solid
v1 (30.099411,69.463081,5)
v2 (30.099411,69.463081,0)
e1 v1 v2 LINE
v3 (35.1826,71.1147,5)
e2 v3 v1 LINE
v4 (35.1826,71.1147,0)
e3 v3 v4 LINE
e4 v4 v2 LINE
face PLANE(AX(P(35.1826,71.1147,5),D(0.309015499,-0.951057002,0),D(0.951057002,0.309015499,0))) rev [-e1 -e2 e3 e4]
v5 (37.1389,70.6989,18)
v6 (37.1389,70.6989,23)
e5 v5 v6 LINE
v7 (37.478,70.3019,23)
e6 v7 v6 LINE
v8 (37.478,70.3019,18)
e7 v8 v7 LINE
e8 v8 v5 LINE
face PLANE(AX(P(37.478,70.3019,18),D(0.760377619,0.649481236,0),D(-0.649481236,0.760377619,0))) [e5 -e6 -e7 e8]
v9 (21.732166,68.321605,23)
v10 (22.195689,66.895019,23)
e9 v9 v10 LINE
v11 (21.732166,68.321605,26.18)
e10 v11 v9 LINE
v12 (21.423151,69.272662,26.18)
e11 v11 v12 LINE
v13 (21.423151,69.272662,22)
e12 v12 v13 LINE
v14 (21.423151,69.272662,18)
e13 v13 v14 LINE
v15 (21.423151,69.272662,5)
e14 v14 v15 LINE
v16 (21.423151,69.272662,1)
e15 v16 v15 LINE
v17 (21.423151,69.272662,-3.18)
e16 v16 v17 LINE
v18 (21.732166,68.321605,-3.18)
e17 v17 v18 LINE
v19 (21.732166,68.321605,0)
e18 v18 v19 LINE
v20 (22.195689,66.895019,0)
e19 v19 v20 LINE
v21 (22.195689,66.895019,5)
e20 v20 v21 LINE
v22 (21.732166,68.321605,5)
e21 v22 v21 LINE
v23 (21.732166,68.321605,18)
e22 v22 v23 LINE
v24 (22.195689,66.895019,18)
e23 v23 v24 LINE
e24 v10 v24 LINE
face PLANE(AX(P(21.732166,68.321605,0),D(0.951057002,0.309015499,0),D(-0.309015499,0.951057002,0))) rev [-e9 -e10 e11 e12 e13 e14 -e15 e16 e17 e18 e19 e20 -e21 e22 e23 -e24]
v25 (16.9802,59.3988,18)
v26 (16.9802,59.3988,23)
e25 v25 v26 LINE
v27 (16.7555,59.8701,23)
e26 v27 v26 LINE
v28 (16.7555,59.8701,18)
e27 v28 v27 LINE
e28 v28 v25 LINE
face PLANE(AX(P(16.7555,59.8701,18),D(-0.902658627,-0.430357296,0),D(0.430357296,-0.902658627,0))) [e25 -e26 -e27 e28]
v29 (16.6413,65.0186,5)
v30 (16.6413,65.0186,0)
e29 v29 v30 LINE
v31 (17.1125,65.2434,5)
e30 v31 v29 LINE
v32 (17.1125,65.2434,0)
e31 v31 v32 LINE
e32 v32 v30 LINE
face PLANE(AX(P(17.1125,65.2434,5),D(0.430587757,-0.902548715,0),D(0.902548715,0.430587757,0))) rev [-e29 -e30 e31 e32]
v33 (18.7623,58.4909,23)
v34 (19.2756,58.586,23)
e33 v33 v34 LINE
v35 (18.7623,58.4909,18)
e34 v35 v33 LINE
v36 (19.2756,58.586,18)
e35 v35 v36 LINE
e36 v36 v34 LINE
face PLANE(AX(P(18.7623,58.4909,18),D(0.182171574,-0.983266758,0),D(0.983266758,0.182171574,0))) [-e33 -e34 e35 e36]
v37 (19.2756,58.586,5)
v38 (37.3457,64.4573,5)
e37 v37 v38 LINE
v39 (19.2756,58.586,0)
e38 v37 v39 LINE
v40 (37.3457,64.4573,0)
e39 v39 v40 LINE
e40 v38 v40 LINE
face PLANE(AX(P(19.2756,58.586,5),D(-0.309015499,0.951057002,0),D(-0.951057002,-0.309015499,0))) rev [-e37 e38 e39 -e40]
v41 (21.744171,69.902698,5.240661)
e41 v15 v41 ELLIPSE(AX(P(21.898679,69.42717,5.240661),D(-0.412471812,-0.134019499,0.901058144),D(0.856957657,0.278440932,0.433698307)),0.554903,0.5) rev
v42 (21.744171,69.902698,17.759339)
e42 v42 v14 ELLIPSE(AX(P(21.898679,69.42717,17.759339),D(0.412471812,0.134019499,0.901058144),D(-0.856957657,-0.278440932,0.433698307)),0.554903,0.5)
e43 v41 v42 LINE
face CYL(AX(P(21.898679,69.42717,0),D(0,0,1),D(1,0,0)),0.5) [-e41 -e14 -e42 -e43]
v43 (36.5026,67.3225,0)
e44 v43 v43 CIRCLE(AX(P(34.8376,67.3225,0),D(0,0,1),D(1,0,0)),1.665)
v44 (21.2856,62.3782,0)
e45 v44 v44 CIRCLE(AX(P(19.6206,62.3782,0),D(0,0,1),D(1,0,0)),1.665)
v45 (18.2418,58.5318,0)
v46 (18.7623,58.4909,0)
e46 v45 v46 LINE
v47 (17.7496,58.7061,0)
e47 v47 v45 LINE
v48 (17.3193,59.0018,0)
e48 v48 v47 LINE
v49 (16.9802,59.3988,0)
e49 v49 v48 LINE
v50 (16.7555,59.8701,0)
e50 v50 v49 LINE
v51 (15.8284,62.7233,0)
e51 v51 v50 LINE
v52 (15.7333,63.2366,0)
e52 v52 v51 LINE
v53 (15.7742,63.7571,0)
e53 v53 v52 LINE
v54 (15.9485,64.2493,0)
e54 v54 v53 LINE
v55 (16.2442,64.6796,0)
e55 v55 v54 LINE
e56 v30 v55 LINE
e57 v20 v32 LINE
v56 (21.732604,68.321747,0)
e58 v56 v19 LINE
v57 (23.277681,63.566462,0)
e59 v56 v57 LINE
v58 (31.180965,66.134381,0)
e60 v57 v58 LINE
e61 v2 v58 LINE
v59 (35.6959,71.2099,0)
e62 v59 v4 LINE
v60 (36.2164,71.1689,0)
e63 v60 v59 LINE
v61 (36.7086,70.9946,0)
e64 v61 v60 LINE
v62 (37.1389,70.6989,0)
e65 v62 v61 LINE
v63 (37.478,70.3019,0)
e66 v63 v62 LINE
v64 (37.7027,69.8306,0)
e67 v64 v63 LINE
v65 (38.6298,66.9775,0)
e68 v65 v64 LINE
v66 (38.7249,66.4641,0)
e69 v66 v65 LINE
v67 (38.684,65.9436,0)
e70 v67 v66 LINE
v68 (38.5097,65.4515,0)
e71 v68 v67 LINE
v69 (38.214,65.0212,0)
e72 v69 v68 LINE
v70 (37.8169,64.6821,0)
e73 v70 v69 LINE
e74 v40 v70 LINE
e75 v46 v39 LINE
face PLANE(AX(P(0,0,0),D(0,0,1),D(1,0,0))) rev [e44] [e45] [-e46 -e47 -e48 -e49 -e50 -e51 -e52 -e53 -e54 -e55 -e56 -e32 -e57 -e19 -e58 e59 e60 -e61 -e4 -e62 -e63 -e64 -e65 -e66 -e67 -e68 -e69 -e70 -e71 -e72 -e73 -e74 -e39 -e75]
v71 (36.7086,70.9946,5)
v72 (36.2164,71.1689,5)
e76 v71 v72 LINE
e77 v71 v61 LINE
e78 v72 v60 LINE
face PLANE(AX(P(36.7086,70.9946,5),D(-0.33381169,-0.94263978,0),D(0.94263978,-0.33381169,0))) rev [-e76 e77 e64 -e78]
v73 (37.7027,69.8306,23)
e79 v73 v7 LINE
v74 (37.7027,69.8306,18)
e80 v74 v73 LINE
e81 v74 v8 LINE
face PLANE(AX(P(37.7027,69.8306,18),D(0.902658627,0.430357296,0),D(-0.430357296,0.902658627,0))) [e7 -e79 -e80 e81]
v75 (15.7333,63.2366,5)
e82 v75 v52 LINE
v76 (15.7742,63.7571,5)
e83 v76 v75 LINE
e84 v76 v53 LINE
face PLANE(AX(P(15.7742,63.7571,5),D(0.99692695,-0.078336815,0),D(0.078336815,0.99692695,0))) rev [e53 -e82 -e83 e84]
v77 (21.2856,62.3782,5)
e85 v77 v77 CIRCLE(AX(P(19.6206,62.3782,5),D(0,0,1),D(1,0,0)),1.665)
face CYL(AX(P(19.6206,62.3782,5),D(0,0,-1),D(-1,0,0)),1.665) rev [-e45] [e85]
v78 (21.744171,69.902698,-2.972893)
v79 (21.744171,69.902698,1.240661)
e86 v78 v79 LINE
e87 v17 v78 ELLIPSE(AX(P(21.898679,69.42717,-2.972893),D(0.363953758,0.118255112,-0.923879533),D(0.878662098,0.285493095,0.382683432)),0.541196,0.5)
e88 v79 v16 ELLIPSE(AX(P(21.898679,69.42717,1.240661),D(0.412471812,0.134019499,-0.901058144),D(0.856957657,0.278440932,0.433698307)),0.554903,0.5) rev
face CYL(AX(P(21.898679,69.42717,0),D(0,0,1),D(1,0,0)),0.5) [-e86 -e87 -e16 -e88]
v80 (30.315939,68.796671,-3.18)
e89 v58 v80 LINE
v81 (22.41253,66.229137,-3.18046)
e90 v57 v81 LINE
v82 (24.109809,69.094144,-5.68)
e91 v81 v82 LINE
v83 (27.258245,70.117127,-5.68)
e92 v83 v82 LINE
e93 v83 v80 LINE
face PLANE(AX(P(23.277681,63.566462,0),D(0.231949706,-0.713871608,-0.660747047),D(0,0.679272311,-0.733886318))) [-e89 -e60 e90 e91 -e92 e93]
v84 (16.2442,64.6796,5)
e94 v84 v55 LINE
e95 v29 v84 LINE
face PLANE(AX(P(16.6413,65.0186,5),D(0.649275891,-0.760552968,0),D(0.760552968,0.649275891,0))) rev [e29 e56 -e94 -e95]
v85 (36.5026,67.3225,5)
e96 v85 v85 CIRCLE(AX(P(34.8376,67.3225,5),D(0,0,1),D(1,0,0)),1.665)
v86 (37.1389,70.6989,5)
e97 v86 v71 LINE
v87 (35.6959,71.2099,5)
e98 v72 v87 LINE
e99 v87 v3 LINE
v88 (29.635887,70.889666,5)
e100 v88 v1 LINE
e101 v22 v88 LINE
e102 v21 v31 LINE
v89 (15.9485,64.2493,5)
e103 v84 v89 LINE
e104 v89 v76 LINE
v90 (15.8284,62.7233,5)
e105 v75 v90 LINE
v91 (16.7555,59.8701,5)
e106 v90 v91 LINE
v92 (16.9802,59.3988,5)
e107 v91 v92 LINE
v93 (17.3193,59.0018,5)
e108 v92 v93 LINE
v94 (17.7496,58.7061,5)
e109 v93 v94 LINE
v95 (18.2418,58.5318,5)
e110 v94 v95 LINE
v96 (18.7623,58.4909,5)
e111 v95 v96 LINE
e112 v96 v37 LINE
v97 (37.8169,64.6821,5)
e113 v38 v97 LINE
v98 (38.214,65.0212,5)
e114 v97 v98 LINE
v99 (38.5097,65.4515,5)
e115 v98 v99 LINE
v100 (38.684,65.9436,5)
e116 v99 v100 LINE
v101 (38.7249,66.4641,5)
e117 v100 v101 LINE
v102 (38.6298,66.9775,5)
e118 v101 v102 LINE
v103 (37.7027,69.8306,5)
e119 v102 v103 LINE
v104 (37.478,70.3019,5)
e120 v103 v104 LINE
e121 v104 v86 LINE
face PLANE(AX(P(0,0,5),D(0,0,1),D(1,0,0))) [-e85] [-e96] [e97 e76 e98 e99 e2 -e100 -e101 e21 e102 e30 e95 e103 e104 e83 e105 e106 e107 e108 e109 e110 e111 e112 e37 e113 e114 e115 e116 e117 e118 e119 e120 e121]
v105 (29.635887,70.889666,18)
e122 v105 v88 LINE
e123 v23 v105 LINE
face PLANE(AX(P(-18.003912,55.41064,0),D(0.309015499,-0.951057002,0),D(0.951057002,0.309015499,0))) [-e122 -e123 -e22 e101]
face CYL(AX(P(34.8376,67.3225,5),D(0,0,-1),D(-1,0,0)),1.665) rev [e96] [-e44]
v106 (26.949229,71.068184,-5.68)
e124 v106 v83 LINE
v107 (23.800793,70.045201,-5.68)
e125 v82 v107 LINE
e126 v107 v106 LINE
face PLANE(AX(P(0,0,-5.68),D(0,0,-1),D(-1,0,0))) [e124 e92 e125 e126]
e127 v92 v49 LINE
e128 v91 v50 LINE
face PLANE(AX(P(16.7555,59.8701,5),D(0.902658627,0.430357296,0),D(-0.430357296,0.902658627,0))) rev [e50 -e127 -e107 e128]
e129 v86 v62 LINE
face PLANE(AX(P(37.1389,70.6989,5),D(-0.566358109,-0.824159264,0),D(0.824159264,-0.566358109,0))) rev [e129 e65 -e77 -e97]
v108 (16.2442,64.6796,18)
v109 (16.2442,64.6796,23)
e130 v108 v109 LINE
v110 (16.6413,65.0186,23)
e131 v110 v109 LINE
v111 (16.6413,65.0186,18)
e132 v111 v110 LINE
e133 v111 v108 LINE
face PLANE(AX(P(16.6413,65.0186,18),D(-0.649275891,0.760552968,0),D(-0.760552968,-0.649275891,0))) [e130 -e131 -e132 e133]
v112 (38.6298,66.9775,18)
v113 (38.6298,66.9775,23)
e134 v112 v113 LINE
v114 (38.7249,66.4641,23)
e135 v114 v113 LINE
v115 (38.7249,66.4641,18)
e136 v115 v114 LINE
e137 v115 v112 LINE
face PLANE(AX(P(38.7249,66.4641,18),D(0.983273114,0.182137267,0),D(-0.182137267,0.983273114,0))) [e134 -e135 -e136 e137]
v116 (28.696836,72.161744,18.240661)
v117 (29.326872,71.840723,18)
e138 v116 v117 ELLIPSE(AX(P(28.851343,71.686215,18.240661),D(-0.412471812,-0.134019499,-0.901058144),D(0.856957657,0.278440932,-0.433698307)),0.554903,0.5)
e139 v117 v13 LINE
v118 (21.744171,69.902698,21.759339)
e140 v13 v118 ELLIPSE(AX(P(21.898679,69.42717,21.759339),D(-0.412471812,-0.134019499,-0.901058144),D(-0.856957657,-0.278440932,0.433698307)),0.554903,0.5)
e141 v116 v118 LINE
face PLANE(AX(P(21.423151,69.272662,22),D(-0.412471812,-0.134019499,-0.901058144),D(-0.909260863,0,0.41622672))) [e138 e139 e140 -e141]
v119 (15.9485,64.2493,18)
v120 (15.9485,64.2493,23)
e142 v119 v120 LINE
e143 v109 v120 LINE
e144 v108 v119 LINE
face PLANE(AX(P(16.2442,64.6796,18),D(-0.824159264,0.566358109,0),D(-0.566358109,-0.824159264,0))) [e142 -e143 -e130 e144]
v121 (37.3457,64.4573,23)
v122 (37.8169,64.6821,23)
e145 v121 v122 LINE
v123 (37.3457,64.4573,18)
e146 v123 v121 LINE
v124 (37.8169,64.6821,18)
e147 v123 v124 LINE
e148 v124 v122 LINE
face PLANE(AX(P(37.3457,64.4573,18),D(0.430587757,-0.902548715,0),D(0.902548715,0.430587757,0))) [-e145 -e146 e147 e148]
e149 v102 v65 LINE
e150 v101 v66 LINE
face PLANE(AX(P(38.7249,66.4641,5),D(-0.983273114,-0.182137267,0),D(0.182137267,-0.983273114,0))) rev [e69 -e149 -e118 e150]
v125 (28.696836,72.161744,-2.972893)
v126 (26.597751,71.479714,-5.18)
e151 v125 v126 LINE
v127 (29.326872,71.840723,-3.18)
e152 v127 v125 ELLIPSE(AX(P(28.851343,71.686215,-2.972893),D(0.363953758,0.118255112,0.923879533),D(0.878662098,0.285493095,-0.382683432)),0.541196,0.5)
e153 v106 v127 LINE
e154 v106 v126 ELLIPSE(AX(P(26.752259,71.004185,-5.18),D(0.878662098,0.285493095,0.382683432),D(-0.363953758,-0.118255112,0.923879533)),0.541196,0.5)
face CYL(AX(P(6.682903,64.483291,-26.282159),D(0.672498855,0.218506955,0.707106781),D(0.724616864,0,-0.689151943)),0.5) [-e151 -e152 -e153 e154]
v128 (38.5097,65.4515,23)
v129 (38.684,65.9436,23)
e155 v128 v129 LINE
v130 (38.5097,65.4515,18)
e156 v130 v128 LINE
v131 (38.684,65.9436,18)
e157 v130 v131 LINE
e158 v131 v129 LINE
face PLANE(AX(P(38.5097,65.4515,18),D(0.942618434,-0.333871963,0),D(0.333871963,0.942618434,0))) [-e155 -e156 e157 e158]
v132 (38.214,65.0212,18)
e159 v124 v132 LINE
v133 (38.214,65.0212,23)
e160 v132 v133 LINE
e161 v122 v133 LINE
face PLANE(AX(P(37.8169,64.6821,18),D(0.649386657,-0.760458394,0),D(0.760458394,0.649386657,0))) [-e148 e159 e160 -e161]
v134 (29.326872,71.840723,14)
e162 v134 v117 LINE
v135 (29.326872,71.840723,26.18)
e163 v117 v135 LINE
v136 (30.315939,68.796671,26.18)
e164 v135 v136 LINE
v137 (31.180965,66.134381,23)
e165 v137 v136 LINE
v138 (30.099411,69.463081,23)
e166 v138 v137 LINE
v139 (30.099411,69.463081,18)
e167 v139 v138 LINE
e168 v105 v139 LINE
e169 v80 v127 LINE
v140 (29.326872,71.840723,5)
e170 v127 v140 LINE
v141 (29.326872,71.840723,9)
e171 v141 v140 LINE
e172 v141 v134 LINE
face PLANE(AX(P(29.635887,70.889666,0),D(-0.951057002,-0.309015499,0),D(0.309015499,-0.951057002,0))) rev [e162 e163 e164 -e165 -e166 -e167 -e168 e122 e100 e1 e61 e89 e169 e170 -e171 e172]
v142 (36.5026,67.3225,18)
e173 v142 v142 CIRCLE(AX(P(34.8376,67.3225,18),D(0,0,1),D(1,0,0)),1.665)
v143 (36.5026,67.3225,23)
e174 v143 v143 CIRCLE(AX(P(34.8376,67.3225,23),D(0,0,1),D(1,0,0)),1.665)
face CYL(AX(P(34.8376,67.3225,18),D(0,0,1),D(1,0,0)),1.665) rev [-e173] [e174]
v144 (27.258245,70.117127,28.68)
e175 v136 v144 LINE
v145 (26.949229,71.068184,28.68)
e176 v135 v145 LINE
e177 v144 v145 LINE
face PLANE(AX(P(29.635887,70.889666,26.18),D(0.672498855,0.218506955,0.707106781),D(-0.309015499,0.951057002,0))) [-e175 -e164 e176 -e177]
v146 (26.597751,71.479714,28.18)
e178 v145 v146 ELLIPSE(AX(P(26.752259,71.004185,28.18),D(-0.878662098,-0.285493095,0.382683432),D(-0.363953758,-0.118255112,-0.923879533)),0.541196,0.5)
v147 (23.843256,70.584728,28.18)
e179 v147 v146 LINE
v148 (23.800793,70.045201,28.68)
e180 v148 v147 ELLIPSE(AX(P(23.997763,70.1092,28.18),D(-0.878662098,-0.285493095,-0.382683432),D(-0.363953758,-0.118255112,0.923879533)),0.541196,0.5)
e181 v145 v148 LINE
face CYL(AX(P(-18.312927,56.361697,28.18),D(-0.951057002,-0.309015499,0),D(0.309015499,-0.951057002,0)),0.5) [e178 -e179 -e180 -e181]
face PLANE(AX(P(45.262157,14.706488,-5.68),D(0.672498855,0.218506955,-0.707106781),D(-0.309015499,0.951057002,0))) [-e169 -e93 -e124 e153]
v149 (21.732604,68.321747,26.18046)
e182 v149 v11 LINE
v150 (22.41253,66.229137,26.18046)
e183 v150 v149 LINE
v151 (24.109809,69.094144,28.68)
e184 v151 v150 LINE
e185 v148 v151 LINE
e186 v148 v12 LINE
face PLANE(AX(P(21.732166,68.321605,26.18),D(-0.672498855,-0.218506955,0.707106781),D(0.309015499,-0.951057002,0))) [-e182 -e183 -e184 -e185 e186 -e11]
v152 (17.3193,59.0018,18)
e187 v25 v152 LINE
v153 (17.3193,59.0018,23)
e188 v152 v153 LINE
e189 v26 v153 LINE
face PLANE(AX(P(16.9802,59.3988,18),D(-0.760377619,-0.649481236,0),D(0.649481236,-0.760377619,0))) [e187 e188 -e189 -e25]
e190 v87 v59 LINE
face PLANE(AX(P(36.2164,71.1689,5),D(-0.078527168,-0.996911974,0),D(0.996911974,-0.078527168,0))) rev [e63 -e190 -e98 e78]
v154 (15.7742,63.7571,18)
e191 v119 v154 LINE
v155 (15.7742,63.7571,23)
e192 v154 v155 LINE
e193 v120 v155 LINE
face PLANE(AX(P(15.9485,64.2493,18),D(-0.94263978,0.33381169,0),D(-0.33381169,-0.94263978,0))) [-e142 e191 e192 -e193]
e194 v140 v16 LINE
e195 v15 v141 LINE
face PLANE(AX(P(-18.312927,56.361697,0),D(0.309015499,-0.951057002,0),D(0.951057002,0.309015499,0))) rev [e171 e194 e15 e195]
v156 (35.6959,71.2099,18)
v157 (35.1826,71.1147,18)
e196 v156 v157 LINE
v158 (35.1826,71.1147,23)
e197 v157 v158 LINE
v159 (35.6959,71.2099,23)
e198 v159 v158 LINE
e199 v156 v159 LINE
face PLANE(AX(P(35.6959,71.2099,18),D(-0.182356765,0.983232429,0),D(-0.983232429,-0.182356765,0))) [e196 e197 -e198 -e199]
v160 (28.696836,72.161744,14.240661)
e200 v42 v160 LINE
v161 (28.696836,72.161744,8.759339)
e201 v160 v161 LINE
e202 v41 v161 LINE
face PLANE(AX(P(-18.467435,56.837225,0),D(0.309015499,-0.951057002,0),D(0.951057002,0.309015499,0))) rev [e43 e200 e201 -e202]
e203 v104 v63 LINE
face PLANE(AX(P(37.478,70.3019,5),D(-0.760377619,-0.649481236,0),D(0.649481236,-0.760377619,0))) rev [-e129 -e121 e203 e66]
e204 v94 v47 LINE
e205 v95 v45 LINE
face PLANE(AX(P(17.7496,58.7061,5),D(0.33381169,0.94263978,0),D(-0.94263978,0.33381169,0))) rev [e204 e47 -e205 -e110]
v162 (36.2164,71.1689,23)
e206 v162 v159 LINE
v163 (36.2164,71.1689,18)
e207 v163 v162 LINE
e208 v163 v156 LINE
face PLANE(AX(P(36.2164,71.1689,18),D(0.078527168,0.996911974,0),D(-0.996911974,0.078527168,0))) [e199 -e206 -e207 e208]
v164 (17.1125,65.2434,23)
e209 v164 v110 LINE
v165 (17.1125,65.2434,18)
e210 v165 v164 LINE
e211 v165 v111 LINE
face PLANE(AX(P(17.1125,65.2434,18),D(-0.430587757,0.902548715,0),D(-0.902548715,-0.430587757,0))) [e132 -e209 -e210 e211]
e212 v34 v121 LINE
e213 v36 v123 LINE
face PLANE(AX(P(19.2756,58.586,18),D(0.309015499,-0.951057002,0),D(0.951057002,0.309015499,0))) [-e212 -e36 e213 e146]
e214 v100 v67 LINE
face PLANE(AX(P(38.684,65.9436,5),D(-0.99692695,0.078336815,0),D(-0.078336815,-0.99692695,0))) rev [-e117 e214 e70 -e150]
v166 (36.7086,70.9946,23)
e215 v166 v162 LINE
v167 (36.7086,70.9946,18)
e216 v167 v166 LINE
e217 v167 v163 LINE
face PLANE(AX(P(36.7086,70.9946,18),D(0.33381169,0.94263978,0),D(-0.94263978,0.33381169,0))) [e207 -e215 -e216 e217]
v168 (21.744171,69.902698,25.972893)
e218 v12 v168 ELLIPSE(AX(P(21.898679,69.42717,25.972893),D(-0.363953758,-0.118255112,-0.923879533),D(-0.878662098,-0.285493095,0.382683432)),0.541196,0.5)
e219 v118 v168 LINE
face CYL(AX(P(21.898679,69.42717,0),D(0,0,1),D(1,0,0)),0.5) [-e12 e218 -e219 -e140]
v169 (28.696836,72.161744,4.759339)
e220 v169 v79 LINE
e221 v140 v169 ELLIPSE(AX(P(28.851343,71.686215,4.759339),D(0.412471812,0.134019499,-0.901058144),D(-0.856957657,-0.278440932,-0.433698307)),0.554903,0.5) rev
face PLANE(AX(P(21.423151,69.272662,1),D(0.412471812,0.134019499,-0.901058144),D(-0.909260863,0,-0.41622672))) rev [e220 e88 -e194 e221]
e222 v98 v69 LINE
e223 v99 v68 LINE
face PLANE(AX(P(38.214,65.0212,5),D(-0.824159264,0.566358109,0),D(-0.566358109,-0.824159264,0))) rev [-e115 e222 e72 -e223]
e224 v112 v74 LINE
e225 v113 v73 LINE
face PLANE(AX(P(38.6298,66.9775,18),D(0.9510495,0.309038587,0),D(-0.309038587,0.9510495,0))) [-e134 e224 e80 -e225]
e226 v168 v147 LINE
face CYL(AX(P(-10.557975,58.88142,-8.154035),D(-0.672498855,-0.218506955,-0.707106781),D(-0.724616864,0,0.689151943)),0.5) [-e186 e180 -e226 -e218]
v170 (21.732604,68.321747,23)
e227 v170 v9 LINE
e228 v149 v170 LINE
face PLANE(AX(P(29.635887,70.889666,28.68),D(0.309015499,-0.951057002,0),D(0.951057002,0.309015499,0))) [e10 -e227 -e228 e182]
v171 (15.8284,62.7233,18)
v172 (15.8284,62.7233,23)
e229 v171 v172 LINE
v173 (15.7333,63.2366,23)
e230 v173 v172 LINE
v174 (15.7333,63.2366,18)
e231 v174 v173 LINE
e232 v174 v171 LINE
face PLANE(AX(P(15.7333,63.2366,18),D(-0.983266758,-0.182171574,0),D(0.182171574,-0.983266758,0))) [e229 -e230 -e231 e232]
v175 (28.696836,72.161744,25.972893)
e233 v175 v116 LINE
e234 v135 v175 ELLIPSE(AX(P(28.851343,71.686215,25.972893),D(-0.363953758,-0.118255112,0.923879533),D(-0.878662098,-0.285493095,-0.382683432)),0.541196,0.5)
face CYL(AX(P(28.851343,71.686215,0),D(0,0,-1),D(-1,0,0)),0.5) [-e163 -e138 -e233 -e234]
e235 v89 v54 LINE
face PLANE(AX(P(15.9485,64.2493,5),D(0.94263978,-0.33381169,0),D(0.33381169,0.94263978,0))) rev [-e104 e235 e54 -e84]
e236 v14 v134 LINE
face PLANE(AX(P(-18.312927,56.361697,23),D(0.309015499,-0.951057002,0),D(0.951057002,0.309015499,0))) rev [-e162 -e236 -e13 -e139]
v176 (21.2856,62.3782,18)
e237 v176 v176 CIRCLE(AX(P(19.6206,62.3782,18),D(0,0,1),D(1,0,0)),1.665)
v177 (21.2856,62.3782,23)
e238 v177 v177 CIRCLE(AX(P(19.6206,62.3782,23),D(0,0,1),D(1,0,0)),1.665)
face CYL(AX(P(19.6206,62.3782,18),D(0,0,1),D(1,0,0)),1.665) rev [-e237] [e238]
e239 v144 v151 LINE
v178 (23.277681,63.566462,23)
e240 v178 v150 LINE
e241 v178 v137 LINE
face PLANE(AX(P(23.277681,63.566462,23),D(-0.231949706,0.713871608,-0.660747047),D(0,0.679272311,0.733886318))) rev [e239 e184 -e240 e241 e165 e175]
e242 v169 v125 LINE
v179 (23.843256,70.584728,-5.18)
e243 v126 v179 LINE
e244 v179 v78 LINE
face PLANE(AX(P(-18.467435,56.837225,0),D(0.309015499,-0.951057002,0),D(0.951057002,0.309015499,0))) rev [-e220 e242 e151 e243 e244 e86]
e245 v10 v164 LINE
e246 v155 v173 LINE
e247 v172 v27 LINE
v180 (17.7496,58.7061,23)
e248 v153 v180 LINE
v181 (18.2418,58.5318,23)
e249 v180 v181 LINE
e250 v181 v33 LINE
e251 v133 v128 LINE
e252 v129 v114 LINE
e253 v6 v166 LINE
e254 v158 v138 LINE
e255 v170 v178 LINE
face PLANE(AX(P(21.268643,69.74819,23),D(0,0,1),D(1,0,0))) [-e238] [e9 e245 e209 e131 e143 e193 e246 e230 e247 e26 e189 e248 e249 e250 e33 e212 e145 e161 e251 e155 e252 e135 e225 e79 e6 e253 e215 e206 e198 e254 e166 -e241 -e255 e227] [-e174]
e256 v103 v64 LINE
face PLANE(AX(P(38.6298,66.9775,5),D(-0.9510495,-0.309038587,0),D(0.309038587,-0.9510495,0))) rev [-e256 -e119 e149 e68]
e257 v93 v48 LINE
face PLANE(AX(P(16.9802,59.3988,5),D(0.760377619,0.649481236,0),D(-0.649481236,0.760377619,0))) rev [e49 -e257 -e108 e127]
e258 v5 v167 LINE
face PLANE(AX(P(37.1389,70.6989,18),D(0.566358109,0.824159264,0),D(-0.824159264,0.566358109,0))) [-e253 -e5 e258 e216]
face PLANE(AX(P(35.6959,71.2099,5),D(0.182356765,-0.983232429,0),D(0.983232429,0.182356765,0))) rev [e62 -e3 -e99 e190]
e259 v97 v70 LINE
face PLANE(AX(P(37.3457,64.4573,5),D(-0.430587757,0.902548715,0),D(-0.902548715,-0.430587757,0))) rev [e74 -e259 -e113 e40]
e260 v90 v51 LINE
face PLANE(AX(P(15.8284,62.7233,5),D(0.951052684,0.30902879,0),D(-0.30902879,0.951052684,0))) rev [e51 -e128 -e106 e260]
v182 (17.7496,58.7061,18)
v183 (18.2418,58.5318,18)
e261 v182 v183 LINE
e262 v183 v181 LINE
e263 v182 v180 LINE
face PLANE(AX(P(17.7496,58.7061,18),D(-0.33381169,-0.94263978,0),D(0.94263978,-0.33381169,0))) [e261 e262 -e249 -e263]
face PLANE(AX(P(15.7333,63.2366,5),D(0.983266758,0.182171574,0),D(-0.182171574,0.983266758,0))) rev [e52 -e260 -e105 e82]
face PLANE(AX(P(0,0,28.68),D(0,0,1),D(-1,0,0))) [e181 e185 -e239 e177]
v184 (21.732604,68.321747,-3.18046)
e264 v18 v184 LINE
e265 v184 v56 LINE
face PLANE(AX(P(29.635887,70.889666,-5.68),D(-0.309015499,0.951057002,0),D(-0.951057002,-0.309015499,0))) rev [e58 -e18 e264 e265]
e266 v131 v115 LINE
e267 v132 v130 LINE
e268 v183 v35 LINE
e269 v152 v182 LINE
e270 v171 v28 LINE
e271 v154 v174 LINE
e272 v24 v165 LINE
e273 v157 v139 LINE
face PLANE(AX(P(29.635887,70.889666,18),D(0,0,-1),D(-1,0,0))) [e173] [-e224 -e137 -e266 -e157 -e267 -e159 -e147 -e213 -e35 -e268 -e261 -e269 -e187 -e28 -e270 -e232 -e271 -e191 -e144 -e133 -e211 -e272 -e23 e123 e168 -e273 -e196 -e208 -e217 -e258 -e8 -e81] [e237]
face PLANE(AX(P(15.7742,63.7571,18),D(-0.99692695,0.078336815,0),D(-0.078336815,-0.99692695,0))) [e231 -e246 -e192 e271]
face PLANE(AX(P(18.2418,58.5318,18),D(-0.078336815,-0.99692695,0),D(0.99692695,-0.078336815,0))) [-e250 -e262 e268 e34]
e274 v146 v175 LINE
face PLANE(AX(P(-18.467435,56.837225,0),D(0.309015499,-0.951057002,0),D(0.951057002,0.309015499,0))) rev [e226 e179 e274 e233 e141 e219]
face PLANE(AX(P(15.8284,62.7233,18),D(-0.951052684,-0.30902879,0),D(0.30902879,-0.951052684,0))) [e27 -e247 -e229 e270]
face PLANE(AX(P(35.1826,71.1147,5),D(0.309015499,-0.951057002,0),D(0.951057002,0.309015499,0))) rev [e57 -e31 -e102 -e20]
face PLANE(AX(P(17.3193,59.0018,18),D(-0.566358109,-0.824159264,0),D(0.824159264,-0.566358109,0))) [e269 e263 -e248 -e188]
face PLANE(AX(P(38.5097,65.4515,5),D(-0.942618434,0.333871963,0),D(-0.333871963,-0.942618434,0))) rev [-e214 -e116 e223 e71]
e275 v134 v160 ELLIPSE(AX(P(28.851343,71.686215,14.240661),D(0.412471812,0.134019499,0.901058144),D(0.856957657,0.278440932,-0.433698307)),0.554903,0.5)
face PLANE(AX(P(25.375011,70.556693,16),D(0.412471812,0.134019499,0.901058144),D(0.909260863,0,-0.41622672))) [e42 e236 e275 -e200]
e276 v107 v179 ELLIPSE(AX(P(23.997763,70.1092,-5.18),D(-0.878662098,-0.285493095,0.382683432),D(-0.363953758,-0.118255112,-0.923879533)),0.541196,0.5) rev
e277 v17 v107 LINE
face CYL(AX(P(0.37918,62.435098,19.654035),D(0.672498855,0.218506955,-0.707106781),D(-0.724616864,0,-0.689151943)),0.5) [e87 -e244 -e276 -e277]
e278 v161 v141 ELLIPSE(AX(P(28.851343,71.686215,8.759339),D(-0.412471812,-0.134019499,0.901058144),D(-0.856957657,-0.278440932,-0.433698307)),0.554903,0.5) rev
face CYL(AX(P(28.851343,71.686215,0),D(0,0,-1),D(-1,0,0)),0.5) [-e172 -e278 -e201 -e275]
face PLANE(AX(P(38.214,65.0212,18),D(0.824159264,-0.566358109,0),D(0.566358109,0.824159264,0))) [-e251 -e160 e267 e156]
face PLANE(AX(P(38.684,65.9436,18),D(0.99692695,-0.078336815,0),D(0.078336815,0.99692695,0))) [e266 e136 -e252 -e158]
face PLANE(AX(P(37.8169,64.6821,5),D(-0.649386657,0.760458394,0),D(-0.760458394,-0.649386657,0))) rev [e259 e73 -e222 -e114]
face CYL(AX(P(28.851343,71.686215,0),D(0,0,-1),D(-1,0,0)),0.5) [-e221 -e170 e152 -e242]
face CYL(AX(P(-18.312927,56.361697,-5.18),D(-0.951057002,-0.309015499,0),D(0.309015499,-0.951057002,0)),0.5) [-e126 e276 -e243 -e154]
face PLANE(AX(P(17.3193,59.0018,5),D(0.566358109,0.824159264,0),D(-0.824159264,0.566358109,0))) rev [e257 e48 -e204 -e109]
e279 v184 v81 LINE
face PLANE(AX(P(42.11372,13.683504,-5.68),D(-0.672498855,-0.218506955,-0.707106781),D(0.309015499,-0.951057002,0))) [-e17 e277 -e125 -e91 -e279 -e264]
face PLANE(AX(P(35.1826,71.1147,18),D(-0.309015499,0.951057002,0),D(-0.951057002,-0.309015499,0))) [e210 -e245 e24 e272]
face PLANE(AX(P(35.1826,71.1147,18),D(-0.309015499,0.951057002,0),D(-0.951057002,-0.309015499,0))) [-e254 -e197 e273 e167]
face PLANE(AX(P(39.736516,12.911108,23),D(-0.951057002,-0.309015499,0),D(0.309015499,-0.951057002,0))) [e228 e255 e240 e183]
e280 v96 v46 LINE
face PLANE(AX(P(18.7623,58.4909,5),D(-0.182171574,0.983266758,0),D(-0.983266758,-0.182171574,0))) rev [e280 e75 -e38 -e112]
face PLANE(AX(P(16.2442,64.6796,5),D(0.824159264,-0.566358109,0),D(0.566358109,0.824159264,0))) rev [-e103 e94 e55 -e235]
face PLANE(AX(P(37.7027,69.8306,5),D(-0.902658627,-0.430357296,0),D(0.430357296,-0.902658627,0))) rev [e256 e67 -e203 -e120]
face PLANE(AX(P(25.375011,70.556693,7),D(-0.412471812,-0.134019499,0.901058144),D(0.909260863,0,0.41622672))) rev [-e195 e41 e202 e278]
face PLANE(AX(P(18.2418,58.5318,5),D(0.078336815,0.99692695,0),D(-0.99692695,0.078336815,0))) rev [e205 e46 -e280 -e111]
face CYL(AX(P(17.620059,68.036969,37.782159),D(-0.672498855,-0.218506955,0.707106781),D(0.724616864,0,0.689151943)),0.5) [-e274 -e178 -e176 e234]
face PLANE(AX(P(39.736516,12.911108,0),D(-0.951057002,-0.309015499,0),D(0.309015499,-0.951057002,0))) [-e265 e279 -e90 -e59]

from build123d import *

# Parameters (mm, degrees)
MODEL_R             = 1.665
BOSS_EXTRUDE1_DEPTH = 5
SKETCH2_W           = 8.310460331
SKETCH2_H           = 5
BOSS_EXTRUDE2_DEPTH = 1.5
BOSS_EXTRUDE3_DEPTH = 1.5
BOSS_EXTRUDE4_DEPTH = 5.68
BOSS_EXTRUDE5_DEPTH = 8.31
CUT_EXTRUDE1_DEPTH  = 0.5
CHAMFER1_SIZE       = 2.5
FILLET1_R           = 0.5


with BuildPart() as part:
    # Model → Boss-Extrude1 (new body)
    with BuildSketch(Plane.XY):
        Polygon((17.1125, 65.2434), (16.6413, 65.0186), (16.2442, 64.6796), (15.9485, 64.2493), (15.7742, 63.7571), (15.7333, 63.2366), (15.8284, 62.7233), (16.7555, 59.8701), (16.9802, 59.3988), (17.3193, 59.0018), (17.7496, 58.7061), (18.2418, 58.5318), (18.7623, 58.4909), (19.2756, 58.586), (37.3457, 64.4573), (37.8169, 64.6821), (38.214, 65.0212), (38.5097, 65.4515), (38.684, 65.9436), (38.7249, 66.4641), (38.6298, 66.9775), (37.7027, 69.8306), (37.478, 70.3019), (37.1389, 70.6989), (36.7086, 70.9946), (36.2164, 71.1689), (35.6959, 71.2099), (35.1826, 71.1147), align=None)
        with Locations((34.8376, 67.3225)):
            Circle(MODEL_R, mode=Mode.SUBTRACT)
        with Locations((19.6206, 62.3782)):
            Circle(MODEL_R, mode=Mode.SUBTRACT)
    boss_extrude1 = extrude(amount=BOSS_EXTRUDE1_DEPTH)

    # Sketch2 → Boss-Extrude2 (add)
    with BuildSketch(Plane(origin=(-17.540388664, 53.984054163, 0), x_dir=(0.9510570020345874, 0.3090154994186907, 0), z_dir=(-0.3090154994186907, 0.9510570020345874, 0))):
        with Locations((45.9361937, -2.5)):
            Rectangle(SKETCH2_W, SKETCH2_H)
    boss_extrude2 = extrude(amount=BOSS_EXTRUDE2_DEPTH)

    # Sketch3 → Boss-Extrude3 (add)
    with BuildSketch(Plane(origin=(-18.003911914, 55.410639666, 0), x_dir=(0.9510570020345874, 0.30901549941869066, 0), z_dir=(-0.30901549941869066, 0.9510570020345874, 0))):
        Polygon((41.780963534, 0), (41.780963534, -5), (41.780963534, -11.5), (50.091423865, -11.5), (50.091423865, -5), (50.091423865, 0), align=None)
    boss_extrude3 = extrude(amount=BOSS_EXTRUDE3_DEPTH)

    # Mirror4: Boss-Extrude3 across plane
    add(boss_extrude3.mirror(Plane.XY.offset(11.5)))

    # Mirror5: Boss-Extrude2 across plane
    add(boss_extrude2.mirror(Plane.XY.offset(11.5)))

    # Mirror8: Boss-Extrude1 across plane
    add(boss_extrude1.mirror(Plane.XY.offset(11.5)))

    # Sketch5 → Boss-Extrude4 (add)
    with BuildSketch(Plane(origin=(0, 0, 0), x_dir=(-1, 0, 0), z_dir=(0, 0, -1))):
        Polygon((-29.172364246, 72.316251531), (-29.635887495, 70.889666028), (-21.732166007, 68.321604978), (-21.268642758, 69.748190481), align=None)
    boss_extrude4 = extrude(amount=BOSS_EXTRUDE4_DEPTH)

    # Mirror9: Boss-Extrude4 across plane
    add(boss_extrude4.mirror(Plane.XY.offset(11.5)))

    # Sketch7 → Boss-Extrude5 (add)
    with BuildSketch(Plane(origin=(47.639799409, 15.479026362, 0), x_dir=(0, 0, -1), z_dir=(0.9510570020345875, 0.3090154994186908, 0))):
        Polygon((5.68, 58.262164673), (0, 58.262164673), (0, 53.262164673), align=None)
    boss_extrude5 = extrude(amount=-BOSS_EXTRUDE5_DEPTH)

    # Mirror10: Boss-Extrude5 across plane
    add(boss_extrude5.mirror(Plane.XY.offset(11.5)))

    # Sketch8 → Cut-Extrude1 (cut)
    with BuildSketch(Plane(origin=(-18.467435163, 56.837225169, 0), x_dir=(0.9510570020345874, 0.30901549941869066, 0), z_dir=(-0.30901549941869066, 0.9510570020345874, 0))):
        Polygon((45.936193699, -7), (50.091423865, -9), (50.091423865, -5), (41.780963534, -1), (41.780963534, -5), align=None)
    cut_extrude1 = extrude(amount=-CUT_EXTRUDE1_DEPTH, mode=Mode.SUBTRACT)

    # Mirror11: Cut-Extrude1 across plane
    add(cut_extrude1.mirror(Plane.XY.offset(11.5)), mode=Mode.SUBTRACT)

    # Chamfer1
    # the kernel refuses this chamfer: 2.5 mm, written as the material it takes off along each edge
    with BuildSketch(Plane(origin=(27.185639489, 78.430794313, -5.68), x_dir=(0.02615014597757756, 0.008496652042775076, 0.9996219169112968), z_dir=(0.30901549941868806, -0.9510570020345883, 0)), Plane(origin=(23.718890764, 62.207062196, -5.68), x_dir=(-0.026150145977578018, -0.008496652042775138, 0.9996219169112968), z_dir=(-0.30901549941868506, 0.9510570020345892, 0))) as chamfer1_piece_1:
        Polygon((CHAMFER1_SIZE * 0.999621916911, CHAMFER1_SIZE * 0.0274958766106), (-CHAMFER1_SIZE * 0.0274958766106, CHAMFER1_SIZE * 0.999621916911), (0, 0), align=None)
    extrude(amount=14.35841494, mode=Mode.SUBTRACT)
    with BuildSketch(Plane(origin=(23.718890764, 62.207062196, 28.68), x_dir=(-0.026150145977578018, -0.008496652042775138, -0.9996219169112968), z_dir=(-0.30901549941868506, 0.9510570020345892, 0)), Plane(origin=(27.185639489, 78.430794313, 28.68), x_dir=(0.02615014597757756, 0.008496652042775076, -0.9996219169112968), z_dir=(0.30901549941868806, -0.9510570020345883, 0))) as chamfer1_piece_2:
        Polygon((CHAMFER1_SIZE * 0.999621916911, -CHAMFER1_SIZE * 0.0274958766106), (-CHAMFER1_SIZE * 0.0274958766106, -CHAMFER1_SIZE * 0.999621916911), (0, 0), align=None)
    extrude(amount=14.35841494, mode=Mode.SUBTRACT)

    # Fillet1
    fillet1_edges = [part.edges().sort_by_distance(p)[0] for p in [
        (29.172364246, 72.316251531, 0.91),
        (21.268642758, 69.748190481, 11.5),
        (29.172364246, 72.316251531, 11.5),
        (21.268642758, 69.748190481, 24.09),
        (21.268642758, 69.748190481, -1.09),
        (25.220503502, 71.032221006, 28.68),
        (29.172364246, 72.316251531, 22.09),
        (27.983542993, 71.929982157, 27.43),
        (22.45746401, 70.134459856, 27.43),
        (25.220503502, 71.032221006, -5.68),
        (22.45746401, 70.134459856, -4.43),
        (27.983542993, 71.929982157, -4.43),
    ]]
    fillet(fillet1_edges, radius=FILLET1_R)


solid = part.part
